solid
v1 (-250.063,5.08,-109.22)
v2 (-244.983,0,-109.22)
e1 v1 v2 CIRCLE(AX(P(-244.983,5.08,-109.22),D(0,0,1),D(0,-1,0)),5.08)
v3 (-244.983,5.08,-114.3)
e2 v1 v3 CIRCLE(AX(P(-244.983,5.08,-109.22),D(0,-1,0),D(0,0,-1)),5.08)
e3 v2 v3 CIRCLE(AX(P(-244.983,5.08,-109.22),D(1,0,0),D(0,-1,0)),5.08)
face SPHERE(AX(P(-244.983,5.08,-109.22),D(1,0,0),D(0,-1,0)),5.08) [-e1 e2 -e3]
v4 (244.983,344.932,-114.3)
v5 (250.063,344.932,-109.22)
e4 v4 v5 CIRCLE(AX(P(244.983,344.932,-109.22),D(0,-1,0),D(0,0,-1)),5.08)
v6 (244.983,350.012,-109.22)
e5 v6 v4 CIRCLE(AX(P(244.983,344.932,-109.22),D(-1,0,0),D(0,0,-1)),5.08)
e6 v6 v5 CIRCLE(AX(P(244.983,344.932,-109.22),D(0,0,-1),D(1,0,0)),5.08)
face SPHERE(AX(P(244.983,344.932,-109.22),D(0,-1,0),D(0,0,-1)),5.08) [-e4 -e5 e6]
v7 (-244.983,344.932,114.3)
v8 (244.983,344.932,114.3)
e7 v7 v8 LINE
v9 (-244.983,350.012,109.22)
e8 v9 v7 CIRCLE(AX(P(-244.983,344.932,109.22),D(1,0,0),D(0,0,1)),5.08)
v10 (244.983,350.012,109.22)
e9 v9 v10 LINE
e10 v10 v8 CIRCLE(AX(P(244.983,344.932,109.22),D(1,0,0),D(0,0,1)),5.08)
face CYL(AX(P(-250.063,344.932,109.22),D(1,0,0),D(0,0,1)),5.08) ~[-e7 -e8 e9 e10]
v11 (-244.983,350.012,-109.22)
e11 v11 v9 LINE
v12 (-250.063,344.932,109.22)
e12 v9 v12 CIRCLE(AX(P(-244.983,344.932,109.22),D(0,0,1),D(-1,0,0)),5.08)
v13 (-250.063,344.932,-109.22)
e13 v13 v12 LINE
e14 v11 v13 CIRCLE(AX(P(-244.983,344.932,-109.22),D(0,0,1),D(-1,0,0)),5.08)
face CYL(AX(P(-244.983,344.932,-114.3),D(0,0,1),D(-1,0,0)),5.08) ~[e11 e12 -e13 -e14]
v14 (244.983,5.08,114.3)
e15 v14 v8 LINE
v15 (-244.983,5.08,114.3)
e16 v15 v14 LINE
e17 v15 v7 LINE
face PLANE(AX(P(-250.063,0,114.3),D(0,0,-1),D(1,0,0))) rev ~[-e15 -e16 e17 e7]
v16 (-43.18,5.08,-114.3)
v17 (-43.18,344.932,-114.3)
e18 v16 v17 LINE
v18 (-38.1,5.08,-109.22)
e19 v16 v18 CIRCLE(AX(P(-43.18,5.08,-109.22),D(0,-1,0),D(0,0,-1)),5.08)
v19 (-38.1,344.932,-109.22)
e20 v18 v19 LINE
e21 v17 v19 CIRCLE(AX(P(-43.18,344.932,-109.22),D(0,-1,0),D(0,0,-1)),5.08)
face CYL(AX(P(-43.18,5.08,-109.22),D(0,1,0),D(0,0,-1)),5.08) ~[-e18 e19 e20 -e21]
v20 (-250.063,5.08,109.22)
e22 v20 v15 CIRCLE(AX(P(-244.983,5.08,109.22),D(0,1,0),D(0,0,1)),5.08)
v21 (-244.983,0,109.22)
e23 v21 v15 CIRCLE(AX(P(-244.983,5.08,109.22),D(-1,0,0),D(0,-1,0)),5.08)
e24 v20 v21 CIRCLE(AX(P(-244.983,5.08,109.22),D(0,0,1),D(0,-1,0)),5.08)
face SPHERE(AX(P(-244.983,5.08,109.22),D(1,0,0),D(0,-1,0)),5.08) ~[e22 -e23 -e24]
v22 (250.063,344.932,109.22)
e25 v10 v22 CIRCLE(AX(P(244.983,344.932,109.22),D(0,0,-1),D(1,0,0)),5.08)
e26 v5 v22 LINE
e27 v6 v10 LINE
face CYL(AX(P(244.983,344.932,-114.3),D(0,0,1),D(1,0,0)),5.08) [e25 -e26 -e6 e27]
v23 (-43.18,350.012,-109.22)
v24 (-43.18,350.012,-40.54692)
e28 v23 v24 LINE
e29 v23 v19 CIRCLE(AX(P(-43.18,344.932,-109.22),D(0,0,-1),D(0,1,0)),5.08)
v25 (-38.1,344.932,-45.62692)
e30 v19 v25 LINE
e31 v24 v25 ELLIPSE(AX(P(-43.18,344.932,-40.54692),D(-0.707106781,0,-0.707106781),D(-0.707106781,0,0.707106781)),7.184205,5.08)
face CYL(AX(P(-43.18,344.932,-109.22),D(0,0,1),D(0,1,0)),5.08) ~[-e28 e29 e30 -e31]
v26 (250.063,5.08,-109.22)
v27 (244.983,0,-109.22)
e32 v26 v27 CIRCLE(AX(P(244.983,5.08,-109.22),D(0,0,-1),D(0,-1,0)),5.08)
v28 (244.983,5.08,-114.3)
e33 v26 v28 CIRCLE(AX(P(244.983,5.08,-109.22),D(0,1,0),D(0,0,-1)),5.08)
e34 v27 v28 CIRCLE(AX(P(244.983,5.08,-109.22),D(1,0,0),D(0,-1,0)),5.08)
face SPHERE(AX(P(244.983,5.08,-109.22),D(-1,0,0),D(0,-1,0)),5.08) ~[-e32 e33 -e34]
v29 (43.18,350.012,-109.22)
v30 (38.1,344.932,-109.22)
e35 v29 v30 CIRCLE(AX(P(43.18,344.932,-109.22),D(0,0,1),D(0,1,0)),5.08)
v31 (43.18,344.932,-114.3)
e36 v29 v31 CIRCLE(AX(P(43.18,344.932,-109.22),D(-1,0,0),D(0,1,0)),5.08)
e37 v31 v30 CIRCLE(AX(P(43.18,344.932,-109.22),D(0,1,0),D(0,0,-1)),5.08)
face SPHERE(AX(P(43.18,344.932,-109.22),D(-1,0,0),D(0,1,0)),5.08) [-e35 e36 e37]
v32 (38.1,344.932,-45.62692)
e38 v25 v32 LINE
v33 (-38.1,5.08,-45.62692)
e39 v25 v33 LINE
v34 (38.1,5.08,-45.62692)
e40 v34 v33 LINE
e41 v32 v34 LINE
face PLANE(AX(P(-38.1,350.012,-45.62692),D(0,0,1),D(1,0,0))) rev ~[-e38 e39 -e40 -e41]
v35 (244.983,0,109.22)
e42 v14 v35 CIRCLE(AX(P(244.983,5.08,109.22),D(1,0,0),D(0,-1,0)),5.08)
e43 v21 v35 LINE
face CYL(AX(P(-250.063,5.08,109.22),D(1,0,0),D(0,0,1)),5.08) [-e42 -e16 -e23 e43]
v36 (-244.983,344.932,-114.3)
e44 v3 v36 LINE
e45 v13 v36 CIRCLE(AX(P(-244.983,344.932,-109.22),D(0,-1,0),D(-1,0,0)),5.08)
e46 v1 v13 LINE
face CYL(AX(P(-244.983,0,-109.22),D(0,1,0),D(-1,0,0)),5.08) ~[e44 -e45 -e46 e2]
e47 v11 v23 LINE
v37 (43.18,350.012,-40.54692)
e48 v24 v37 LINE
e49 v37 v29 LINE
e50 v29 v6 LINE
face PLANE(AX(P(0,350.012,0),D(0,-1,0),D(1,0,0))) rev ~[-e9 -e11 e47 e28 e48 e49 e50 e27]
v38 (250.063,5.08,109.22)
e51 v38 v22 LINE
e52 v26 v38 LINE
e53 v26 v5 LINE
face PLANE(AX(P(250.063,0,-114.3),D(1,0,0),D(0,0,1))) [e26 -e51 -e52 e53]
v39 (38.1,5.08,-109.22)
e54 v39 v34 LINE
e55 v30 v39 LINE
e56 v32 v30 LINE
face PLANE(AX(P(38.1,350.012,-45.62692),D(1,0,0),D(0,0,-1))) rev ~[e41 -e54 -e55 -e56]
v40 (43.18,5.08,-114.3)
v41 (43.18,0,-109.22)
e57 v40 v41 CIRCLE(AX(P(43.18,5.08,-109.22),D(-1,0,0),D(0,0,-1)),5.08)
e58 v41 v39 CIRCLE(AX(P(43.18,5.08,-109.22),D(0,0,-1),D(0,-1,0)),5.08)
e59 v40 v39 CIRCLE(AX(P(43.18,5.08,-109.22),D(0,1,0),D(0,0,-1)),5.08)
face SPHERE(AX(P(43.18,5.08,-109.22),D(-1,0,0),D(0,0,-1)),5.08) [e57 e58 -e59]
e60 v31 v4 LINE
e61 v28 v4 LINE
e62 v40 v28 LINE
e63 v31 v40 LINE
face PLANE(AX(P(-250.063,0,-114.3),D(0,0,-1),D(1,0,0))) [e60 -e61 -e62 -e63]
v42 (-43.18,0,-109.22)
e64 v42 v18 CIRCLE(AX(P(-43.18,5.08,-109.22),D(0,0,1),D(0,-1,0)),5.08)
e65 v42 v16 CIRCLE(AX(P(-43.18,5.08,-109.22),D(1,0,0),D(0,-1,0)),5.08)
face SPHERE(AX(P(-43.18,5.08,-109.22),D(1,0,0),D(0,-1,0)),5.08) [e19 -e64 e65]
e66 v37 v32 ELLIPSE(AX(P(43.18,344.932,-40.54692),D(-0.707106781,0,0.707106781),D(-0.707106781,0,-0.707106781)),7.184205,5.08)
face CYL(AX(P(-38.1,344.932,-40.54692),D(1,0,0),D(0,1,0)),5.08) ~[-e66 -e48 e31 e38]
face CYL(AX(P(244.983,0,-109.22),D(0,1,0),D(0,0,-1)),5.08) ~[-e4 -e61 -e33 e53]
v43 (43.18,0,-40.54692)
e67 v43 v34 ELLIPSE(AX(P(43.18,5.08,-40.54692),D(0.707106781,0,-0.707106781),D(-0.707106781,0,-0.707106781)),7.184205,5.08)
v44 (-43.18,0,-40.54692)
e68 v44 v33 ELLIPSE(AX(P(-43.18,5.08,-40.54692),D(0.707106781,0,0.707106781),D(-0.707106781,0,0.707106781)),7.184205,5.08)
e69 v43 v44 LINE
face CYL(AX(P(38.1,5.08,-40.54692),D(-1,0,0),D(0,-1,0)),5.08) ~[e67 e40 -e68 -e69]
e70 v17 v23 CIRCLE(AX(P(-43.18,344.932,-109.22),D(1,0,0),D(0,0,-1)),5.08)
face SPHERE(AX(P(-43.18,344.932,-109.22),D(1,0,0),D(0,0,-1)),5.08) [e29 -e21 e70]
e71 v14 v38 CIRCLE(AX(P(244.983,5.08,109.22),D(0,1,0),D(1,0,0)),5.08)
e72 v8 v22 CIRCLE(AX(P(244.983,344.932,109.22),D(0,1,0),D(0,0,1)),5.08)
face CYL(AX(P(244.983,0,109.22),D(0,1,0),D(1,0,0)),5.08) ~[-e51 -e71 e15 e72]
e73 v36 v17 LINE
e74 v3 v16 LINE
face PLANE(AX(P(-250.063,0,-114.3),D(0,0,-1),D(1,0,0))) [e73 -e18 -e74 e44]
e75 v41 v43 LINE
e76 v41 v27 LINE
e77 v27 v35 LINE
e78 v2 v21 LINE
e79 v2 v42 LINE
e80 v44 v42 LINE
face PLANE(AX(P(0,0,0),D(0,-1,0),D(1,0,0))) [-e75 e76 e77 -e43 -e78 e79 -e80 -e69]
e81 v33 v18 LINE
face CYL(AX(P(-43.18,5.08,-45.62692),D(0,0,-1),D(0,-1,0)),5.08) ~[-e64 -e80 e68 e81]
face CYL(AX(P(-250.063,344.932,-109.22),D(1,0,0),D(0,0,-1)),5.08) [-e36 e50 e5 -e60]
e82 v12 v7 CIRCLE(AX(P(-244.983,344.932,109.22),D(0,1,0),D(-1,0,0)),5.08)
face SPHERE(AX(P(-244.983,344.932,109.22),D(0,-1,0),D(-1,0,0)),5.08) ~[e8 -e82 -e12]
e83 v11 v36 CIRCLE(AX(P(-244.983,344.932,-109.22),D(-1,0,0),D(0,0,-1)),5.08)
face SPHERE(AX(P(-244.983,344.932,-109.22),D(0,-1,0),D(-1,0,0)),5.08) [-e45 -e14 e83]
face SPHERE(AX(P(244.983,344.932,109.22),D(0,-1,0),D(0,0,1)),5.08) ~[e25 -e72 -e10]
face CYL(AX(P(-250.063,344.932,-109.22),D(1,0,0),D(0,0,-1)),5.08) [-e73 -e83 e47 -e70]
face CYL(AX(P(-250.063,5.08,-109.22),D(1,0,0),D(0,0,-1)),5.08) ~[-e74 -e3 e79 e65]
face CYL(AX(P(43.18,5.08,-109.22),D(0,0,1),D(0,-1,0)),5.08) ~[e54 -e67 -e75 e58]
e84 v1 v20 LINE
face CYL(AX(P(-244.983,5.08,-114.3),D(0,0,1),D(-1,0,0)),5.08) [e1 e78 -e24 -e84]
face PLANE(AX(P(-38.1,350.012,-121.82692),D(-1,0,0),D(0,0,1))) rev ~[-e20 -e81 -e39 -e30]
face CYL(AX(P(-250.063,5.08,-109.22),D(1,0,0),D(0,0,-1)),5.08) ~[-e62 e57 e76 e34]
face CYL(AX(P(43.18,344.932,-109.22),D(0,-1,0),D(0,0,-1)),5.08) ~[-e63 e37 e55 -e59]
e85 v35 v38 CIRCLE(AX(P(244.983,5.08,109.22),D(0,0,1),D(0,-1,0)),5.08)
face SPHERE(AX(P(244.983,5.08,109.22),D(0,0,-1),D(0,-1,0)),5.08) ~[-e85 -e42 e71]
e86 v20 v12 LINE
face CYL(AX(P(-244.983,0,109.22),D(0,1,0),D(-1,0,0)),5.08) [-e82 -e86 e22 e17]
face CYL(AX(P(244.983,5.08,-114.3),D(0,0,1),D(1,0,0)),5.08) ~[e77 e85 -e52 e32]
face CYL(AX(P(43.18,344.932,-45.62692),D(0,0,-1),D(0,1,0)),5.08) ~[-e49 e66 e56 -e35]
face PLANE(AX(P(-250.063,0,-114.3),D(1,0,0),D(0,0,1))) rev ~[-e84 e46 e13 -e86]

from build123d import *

# Parameters (mm, degrees)
F0_W     = 500.126
F0_H     = 228.6
F1_DEPTH = 350.012
F2_R     = 5.08
F4_DEPTH = 350.013
F5_R     = 5.08


with BuildPart() as f1:
    # F0 (on Front) → F1 (new body)
    with BuildSketch(Plane.XZ):
        Rectangle(F0_W, F0_H)
    extrude(amount=-F1_DEPTH)

    # F2
    f2_edges = [f1.edges().sort_by_distance(p)[0] for p in [
        (0, 0, -114.3),
        (250.063, 0, 0),
        (0, 0, 114.3),
        (-250.063, 0, 0),
        (-250.063, 175.006, 114.3),
        (-250.063, 175.006, -114.3),
        (-250.063, 350.012, 0),
        (250.063, 175.006, 114.3),
        (0, 350.012, 114.3),
        (250.063, 175.006, -114.3),
        (0, 350.012, -114.3),
        (250.063, 350.012, 0),
    ]]
    fillet(f2_edges, radius=F2_R)

    # F3 (on face) → F4 (cut, through all)
    with BuildSketch(Plane(origin=(0, 350.012, 0), x_dir=(-1, 0, 0), z_dir=(0, 1, 0))):
        Polygon((38.1, -94.107), (38.1, -45.6269201875), (0, -45.6269201875), (-38.1, -45.6269201875), (-38.1, -121.8269201875), (0, -121.8269201875), (38.1, -121.8269201875), align=None)
    extrude(amount=-F4_DEPTH, mode=Mode.SUBTRACT)

    # F5
    f5_edges = [f1.edges().sort_by_distance(p)[0] for p in [
        (0, 0, -45.62692),
        (-38.1, 0, -77.42346),
        (38.1, 0, -77.42346),
        (-38.1, 350.012, -77.42346),
        (0, 350.012, -45.62692),
        (38.1, 350.012, -77.42346),
        (-38.1, 175.006, -114.3),
        (-38.1, 1.487898, -112.812102),
        (-38.1, 348.524102, -112.812102),
        (38.1, 1.487898, -112.812102),
        (38.1, 348.524102, -112.812102),
        (38.1, 175.006, -114.3),
    ]]
    fillet(f5_edges, radius=F5_R)


solid = f1.part
